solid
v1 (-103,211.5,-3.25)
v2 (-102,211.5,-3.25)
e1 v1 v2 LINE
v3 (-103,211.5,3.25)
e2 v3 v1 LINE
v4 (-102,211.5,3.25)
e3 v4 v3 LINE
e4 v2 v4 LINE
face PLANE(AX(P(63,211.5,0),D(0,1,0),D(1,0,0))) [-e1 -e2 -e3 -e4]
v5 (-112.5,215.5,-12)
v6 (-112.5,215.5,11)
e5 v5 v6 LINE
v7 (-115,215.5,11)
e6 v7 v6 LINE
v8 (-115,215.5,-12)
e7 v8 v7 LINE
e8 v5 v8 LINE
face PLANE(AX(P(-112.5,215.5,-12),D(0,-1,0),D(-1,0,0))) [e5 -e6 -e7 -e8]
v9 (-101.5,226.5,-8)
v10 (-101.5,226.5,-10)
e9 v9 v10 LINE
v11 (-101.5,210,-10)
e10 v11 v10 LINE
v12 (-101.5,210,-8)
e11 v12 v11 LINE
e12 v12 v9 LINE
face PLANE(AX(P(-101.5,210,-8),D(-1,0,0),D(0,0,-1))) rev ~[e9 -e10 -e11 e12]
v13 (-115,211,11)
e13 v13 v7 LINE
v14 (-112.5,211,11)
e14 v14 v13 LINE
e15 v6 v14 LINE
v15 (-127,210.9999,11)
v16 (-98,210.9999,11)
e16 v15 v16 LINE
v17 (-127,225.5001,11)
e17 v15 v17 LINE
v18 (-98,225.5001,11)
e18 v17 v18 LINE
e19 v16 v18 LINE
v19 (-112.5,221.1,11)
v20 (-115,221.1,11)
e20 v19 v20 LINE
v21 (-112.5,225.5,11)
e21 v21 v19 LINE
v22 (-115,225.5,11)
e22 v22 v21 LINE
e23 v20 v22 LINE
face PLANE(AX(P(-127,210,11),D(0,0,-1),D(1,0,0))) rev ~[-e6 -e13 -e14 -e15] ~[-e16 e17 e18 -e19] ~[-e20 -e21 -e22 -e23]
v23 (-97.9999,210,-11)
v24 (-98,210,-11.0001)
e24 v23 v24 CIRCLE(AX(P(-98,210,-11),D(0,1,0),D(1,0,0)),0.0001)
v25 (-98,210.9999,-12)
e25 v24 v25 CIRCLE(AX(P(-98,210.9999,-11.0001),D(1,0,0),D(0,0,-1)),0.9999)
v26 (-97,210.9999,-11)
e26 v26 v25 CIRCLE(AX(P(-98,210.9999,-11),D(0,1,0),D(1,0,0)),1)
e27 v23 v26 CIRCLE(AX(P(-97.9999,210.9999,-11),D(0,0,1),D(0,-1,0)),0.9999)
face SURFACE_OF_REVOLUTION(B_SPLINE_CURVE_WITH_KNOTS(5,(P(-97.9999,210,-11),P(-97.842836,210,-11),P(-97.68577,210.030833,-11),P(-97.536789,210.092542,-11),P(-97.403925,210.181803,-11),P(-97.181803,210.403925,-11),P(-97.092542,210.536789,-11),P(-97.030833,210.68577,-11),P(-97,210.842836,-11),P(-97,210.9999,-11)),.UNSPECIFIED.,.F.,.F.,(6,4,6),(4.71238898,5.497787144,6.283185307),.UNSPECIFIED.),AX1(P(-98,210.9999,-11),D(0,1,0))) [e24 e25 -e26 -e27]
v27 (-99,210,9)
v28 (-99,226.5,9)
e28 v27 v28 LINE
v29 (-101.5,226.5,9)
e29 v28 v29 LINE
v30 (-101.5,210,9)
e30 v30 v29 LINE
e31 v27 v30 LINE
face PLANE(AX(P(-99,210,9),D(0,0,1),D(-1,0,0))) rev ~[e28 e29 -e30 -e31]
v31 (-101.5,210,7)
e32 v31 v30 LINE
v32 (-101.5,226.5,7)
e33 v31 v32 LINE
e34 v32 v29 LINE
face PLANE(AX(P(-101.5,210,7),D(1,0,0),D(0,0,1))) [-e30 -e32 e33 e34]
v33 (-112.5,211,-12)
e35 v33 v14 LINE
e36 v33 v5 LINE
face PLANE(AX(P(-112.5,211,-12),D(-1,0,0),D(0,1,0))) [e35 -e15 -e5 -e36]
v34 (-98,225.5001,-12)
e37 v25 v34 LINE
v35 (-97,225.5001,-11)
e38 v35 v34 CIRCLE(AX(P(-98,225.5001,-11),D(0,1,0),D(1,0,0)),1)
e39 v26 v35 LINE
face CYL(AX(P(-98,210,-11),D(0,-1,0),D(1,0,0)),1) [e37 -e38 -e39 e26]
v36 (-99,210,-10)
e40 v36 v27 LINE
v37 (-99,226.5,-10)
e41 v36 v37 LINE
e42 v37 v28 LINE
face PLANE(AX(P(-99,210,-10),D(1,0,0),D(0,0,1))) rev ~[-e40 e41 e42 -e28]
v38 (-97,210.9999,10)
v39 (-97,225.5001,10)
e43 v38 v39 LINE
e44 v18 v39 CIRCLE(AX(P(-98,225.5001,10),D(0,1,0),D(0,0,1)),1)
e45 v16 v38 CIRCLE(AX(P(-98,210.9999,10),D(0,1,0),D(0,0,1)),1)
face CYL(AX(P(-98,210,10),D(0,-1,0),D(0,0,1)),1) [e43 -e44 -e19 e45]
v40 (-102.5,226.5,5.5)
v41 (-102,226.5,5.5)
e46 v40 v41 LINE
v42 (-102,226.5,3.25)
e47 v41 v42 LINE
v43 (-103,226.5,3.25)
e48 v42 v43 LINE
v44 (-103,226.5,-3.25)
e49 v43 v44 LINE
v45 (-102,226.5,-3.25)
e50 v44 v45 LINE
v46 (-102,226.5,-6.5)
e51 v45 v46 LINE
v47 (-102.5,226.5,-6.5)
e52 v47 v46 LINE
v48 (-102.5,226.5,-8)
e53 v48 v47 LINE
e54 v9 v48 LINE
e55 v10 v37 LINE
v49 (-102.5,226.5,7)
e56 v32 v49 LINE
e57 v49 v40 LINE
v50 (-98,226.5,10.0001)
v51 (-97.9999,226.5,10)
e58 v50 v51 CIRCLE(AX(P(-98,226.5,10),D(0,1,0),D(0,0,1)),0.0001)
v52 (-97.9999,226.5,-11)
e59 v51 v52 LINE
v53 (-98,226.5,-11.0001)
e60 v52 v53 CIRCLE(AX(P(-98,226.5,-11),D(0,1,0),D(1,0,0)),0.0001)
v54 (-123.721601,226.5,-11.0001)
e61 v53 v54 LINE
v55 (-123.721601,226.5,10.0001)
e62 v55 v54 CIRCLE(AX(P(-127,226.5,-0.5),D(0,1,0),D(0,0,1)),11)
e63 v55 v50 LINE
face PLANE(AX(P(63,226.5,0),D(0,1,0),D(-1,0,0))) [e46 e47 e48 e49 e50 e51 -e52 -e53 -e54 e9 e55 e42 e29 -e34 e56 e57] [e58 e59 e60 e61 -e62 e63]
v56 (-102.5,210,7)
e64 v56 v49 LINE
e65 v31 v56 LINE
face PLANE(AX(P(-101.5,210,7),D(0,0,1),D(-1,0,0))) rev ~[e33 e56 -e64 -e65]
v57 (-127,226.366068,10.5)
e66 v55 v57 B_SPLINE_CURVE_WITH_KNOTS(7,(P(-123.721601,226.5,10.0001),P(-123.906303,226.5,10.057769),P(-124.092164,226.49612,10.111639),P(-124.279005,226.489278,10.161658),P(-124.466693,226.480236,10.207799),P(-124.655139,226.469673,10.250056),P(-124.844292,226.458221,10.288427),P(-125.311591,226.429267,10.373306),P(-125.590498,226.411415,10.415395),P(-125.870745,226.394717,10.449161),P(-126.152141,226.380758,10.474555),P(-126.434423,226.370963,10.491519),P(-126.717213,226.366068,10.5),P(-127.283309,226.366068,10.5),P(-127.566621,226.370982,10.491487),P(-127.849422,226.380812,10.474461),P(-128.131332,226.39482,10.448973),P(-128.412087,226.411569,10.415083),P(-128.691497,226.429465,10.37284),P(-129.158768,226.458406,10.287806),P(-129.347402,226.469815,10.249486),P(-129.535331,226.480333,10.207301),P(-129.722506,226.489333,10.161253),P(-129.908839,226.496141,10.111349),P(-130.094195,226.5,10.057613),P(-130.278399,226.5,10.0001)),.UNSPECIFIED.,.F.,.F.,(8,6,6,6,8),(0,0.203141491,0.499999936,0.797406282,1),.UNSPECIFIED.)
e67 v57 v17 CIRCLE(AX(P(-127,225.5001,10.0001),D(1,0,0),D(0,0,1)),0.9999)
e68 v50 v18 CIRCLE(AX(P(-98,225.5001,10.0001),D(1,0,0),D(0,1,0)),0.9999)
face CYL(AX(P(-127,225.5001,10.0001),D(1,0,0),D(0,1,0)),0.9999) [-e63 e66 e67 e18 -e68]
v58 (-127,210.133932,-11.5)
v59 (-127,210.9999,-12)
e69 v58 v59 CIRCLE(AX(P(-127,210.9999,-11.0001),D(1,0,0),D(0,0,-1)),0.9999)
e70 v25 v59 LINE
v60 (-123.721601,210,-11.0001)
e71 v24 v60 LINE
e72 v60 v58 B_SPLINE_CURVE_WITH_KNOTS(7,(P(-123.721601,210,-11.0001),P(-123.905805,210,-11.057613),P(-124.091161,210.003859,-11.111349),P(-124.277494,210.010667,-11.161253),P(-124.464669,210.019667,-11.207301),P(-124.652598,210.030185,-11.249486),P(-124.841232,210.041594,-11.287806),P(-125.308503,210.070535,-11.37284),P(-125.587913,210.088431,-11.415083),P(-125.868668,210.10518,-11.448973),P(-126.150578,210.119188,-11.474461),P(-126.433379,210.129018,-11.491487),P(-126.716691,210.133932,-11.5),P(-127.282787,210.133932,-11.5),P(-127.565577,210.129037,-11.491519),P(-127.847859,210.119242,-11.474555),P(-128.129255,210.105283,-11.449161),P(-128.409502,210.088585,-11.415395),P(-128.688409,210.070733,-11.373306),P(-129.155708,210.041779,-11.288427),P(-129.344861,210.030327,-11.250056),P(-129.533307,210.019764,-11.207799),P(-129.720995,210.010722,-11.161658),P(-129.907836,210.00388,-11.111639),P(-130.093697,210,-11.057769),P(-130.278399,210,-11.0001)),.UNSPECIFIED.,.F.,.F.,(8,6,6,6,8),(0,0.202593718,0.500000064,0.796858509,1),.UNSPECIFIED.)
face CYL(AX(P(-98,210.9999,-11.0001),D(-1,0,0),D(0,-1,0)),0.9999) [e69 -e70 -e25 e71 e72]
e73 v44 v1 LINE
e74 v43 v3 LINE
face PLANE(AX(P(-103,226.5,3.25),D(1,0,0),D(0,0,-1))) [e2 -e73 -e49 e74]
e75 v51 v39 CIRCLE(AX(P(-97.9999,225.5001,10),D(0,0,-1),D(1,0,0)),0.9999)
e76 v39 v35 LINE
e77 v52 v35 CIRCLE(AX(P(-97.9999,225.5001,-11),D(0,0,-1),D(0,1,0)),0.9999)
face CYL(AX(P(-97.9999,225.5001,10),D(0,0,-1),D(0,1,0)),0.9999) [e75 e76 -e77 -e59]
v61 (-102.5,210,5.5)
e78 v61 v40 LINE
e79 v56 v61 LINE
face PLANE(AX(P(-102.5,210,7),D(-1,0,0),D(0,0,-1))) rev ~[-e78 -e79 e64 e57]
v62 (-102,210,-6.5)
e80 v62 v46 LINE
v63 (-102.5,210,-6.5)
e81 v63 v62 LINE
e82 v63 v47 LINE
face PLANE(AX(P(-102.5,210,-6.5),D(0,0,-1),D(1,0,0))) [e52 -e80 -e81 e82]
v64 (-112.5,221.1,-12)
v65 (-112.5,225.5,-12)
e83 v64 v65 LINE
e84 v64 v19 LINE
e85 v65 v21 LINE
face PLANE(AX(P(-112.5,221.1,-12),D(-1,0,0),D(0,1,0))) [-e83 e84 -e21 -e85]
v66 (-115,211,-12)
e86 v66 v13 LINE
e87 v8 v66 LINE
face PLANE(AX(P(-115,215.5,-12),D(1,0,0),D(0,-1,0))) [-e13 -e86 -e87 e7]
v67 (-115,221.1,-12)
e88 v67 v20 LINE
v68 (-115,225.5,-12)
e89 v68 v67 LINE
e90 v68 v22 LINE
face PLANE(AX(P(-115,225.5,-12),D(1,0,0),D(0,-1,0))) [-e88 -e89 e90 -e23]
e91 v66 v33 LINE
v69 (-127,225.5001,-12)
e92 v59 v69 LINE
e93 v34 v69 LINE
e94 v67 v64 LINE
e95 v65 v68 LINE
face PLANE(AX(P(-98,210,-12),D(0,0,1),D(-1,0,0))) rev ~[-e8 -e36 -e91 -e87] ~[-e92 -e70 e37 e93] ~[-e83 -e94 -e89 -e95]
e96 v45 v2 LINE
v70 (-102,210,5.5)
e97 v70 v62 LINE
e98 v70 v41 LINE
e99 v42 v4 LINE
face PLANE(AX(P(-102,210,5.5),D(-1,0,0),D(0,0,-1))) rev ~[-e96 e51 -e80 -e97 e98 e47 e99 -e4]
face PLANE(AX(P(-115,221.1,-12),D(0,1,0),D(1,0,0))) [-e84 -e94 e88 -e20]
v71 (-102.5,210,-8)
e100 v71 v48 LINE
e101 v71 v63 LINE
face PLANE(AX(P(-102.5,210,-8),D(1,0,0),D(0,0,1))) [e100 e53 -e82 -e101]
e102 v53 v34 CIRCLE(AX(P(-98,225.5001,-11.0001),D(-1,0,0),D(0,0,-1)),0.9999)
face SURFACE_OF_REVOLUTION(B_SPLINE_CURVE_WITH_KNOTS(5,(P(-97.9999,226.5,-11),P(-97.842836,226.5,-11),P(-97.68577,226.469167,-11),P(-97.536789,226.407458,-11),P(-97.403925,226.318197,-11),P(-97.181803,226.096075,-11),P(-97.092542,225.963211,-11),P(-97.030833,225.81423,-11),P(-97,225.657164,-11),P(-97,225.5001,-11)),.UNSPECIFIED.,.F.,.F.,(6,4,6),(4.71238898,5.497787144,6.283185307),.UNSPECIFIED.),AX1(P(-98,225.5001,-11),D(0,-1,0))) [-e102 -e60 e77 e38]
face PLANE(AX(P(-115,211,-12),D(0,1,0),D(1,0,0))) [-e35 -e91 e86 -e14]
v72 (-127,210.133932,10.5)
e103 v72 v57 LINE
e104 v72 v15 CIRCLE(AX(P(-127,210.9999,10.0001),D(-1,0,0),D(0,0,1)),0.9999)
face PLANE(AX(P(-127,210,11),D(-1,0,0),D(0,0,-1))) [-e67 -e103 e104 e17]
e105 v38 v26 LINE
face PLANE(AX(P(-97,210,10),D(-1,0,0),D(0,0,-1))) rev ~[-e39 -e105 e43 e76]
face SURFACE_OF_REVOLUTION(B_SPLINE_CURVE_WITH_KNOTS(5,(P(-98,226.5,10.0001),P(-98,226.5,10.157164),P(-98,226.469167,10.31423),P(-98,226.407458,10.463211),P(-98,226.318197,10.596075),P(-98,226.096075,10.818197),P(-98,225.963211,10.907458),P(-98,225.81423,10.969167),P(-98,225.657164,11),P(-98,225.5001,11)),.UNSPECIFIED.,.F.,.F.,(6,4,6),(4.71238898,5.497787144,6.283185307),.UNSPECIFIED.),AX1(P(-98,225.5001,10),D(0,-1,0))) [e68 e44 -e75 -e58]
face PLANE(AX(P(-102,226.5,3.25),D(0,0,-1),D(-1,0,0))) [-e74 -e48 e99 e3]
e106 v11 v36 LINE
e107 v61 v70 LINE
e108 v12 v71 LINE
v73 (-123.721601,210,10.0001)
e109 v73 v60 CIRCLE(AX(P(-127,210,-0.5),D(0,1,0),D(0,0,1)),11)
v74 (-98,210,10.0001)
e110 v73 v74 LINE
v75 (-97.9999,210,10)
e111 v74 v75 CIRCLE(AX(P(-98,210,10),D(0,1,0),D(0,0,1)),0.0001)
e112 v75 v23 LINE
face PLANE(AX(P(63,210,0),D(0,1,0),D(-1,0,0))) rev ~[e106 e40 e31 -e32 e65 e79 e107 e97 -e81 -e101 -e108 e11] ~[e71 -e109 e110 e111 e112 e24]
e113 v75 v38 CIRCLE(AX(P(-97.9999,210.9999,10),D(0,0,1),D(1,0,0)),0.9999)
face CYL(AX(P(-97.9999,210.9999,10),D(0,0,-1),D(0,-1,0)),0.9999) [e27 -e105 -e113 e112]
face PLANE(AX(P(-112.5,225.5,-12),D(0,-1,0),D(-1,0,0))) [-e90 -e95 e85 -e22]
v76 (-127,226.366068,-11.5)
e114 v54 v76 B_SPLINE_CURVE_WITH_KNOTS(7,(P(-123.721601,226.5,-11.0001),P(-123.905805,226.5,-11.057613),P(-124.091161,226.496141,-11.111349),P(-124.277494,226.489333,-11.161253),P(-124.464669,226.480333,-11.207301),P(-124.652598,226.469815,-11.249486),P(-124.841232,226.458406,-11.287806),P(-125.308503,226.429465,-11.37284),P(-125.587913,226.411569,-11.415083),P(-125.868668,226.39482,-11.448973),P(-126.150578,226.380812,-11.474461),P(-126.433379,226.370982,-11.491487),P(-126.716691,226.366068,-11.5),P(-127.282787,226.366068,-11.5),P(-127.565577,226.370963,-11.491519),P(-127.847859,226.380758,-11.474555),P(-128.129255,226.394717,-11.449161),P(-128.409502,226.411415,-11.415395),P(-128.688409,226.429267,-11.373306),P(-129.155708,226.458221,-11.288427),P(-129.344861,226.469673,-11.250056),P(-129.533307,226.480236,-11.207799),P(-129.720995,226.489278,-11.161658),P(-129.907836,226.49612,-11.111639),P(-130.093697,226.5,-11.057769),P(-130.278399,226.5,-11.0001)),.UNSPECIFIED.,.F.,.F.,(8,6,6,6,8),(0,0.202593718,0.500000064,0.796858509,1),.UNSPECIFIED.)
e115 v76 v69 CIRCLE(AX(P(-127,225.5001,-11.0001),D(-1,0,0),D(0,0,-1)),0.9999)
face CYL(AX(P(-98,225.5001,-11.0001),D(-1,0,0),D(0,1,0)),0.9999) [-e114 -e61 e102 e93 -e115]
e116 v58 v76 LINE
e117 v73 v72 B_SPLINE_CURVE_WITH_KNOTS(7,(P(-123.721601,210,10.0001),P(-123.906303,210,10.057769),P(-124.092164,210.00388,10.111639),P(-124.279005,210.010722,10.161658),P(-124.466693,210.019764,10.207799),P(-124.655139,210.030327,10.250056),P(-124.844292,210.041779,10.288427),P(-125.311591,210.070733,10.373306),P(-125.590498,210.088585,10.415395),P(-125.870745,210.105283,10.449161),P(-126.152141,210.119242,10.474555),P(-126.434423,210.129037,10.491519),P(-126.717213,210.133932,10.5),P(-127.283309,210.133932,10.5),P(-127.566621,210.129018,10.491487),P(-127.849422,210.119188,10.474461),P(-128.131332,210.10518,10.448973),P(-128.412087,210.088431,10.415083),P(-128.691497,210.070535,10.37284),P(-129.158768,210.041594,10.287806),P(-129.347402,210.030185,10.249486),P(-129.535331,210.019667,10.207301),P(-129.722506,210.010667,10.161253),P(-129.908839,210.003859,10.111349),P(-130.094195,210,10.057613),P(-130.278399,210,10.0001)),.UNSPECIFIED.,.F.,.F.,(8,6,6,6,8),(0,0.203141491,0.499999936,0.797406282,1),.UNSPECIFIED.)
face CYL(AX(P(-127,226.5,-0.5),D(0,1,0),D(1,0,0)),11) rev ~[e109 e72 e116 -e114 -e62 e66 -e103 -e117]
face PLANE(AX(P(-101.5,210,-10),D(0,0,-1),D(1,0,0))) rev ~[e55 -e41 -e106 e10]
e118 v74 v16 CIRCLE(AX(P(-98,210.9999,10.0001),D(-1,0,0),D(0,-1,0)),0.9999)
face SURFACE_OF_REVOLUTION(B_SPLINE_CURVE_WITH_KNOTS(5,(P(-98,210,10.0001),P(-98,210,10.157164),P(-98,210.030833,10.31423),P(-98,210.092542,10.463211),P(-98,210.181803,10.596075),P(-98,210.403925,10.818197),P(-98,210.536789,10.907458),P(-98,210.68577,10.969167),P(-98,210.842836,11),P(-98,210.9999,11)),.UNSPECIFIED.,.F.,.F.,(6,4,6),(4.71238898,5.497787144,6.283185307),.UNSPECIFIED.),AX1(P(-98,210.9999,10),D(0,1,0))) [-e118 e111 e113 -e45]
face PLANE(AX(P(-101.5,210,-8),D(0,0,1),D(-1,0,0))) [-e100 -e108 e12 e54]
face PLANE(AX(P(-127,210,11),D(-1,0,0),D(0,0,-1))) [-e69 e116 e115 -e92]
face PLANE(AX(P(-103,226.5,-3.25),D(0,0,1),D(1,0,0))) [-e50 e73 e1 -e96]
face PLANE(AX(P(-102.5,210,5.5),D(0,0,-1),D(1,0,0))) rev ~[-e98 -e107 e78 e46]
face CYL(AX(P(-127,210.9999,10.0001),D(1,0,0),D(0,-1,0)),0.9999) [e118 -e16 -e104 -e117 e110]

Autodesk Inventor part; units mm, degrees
ref_plane "YZ Plane" through (0, 0, 0) normal (1, 0, 0) x (0, 1, 0)
ref_plane "XZ Plane" through (0, 0, 0) normal (0, 1, 0) x (-1, 0, 0)
ref_plane "XY Plane" through (0, 0, 0) normal (0, 0, 1) x (1, 0, 0)
sketch "Sketch1" plane through (0, 0, 0) normal (0, 1, 0) x (-1, 0, 0)
  line L0 (162, 9) -> (164.5, 9)
  line L1 (164.5, -10) -> (162, -10)
  line L2 (162, -10) -> (162, 9)
  line L3 (190, 11) -> (161, 11)
  line L4 (160, 10) -> (160, -11)
  line L5 (161, -12) -> (190, -12)
  line L6 (164.5, 7) -> (165.5, 7)
  line L7 (164.5, -8) -> (165.5, -8)
  line L8 (165.5, 7) -> (165.5, 5.5)
  line L9 (165.5, 5.5) -> (165, 5.5)
  line L10 (165.5, -8) -> (165.5, -6.5)
  line L11 (165.5, -6.5) -> (165, -6.5)
  line L12 (164.5, 7) -> (164.5, 9)
  line L13 (165, 5.5) -> (165, -6.5)
  line L14 (164.5, -8) -> (164.5, -10)
  arc A0 (161, 11) -> (160, 10) centre (161, 10) ccw
  arc A1 (160, -11) -> (161, -12) centre (161, -11) ccw
  line L15 (190, 11) -> (190, -12)
  point P0 (0, 0)
  dimension "d0" = 19
  dimension "d1" = 2.5
  dimension "d3" = 2
  dimension "d4" = 2
  dimension "d5" = 2
  dimension "d7" = 1
  dimension "d8" = 15
  dimension "d10" = 1.5
  dimension "d11" = 1.5
  dimension "d12" = 1
  dimension "d22" = 4
  dimension "d28" = 3
  dimension "d36" = 30
  dimension "d46" = 11
  dimension "d48" = 190
extrude "Extrusion1" add sketch "Sketch1" along normal blind 16.5
sketch "Sketch5" plane through (0, 16.5, 0) normal (0, 1, 0) x (1, 0, 0)
  line L0 (-165, -3.25) -> (-166, -3.25)
  line L1 (-166, -3.25) -> (-166, 3.25)
  line L2 (-166, 3.25) -> (-165, 3.25)
  line L3 (-165, 3.25) -> (-165, -3.25)
  line L4 (-165, -5.5) -> (-165, 6.5) projected
  line L5 (-190, -11) -> (-161, -11) projected
  point P0 (0, 0)
  point P1 (-21.5, -2)
  dimension "d15" = 1
  dimension "d16" = 6.5
  dimension "d17" = 0
  dimension "d18" = 7.75
extrude "Extrusion2" cut sketch "Sketch5" against normal blind 15
move or copy body "Move Body2" bodies to move or copy 1 copy no translate (63, 210, 0)
fillet "Fillet1" [suppressed]
sketch "Sketch21" plane through (-127, 226.5, 11) normal (0, 1, 0) x (1, 0, 0)
  circle A0 centre (0, 11.5) radius 11
  line L0 (24, 7.75) -> (24, 14.25) projected
  line L1 (29, 23) -> (0, 23) projected
  circle A1 centre (0, 11.5) radius 13
  line L2 (0, 0) -> (29, 0) projected
  point P0 (127, 11)
  point P1 (6.0622, 0)
  dimension "d61" = 26
  dimension "d56" = 22
  dimension "d57" = 24
  dimension "d58" = 11.5
extrude "Extrusion4" cut sketch "Sketch21" against normal up to next contours A0
sketch "Sketch24" plane through (-98, 210, -12) normal (0, 0, -1) x (-1, 0, 0)
  line L0 (17, 1) -> (14.5, 1)
  line L1 (14.5, 1) -> (14.5, 5.5)
  line L2 (14.5, 5.5) -> (17, 5.5)
  line L3 (17, 5.5) -> (17, 1)
  line L4 (17, 11.1) -> (14.5, 11.1)
  line L5 (14.5, 11.1) -> (14.5, 15.5)
  line L6 (14.5, 15.5) -> (17, 15.5)
  line L7 (17, 15.5) -> (17, 11.1)
  line L8 (29, 0) -> (0, 0) projected
  line L9 (29, 0) -> (29, 16.5) projected
  line L10 (0, 16.5) -> (29, 16.5) projected
  point P0 (-98, -210)
  dimension "d68" = 2.5
  dimension "d69" = 4.5
  dimension "d70" = 2.5
  dimension "d71" = 4.4
  dimension "d72" = 1
  dimension "d73" = 12
  dimension "d74" = 12
  dimension "d75" = 1
extrude "Extrusion5" cut sketch "Sketch24" against normal up to next
fillet "Fillet2" radius 1 10 edges at (-97.2929, 210, -11.7071) (-97, 210, -0.5) (-97.2929, 210, 10.7071) (-112.5, 210, 11) (-112.5, 210, -12) (-97.2929, 226.5, -11.7071) (-97, 226.5, -0.5) (-97.2929, 226.5, 10.7071) (-112.5, 226.5, 11) (-112.5, 226.5, -12)
properties part number "rear_light_mount"
